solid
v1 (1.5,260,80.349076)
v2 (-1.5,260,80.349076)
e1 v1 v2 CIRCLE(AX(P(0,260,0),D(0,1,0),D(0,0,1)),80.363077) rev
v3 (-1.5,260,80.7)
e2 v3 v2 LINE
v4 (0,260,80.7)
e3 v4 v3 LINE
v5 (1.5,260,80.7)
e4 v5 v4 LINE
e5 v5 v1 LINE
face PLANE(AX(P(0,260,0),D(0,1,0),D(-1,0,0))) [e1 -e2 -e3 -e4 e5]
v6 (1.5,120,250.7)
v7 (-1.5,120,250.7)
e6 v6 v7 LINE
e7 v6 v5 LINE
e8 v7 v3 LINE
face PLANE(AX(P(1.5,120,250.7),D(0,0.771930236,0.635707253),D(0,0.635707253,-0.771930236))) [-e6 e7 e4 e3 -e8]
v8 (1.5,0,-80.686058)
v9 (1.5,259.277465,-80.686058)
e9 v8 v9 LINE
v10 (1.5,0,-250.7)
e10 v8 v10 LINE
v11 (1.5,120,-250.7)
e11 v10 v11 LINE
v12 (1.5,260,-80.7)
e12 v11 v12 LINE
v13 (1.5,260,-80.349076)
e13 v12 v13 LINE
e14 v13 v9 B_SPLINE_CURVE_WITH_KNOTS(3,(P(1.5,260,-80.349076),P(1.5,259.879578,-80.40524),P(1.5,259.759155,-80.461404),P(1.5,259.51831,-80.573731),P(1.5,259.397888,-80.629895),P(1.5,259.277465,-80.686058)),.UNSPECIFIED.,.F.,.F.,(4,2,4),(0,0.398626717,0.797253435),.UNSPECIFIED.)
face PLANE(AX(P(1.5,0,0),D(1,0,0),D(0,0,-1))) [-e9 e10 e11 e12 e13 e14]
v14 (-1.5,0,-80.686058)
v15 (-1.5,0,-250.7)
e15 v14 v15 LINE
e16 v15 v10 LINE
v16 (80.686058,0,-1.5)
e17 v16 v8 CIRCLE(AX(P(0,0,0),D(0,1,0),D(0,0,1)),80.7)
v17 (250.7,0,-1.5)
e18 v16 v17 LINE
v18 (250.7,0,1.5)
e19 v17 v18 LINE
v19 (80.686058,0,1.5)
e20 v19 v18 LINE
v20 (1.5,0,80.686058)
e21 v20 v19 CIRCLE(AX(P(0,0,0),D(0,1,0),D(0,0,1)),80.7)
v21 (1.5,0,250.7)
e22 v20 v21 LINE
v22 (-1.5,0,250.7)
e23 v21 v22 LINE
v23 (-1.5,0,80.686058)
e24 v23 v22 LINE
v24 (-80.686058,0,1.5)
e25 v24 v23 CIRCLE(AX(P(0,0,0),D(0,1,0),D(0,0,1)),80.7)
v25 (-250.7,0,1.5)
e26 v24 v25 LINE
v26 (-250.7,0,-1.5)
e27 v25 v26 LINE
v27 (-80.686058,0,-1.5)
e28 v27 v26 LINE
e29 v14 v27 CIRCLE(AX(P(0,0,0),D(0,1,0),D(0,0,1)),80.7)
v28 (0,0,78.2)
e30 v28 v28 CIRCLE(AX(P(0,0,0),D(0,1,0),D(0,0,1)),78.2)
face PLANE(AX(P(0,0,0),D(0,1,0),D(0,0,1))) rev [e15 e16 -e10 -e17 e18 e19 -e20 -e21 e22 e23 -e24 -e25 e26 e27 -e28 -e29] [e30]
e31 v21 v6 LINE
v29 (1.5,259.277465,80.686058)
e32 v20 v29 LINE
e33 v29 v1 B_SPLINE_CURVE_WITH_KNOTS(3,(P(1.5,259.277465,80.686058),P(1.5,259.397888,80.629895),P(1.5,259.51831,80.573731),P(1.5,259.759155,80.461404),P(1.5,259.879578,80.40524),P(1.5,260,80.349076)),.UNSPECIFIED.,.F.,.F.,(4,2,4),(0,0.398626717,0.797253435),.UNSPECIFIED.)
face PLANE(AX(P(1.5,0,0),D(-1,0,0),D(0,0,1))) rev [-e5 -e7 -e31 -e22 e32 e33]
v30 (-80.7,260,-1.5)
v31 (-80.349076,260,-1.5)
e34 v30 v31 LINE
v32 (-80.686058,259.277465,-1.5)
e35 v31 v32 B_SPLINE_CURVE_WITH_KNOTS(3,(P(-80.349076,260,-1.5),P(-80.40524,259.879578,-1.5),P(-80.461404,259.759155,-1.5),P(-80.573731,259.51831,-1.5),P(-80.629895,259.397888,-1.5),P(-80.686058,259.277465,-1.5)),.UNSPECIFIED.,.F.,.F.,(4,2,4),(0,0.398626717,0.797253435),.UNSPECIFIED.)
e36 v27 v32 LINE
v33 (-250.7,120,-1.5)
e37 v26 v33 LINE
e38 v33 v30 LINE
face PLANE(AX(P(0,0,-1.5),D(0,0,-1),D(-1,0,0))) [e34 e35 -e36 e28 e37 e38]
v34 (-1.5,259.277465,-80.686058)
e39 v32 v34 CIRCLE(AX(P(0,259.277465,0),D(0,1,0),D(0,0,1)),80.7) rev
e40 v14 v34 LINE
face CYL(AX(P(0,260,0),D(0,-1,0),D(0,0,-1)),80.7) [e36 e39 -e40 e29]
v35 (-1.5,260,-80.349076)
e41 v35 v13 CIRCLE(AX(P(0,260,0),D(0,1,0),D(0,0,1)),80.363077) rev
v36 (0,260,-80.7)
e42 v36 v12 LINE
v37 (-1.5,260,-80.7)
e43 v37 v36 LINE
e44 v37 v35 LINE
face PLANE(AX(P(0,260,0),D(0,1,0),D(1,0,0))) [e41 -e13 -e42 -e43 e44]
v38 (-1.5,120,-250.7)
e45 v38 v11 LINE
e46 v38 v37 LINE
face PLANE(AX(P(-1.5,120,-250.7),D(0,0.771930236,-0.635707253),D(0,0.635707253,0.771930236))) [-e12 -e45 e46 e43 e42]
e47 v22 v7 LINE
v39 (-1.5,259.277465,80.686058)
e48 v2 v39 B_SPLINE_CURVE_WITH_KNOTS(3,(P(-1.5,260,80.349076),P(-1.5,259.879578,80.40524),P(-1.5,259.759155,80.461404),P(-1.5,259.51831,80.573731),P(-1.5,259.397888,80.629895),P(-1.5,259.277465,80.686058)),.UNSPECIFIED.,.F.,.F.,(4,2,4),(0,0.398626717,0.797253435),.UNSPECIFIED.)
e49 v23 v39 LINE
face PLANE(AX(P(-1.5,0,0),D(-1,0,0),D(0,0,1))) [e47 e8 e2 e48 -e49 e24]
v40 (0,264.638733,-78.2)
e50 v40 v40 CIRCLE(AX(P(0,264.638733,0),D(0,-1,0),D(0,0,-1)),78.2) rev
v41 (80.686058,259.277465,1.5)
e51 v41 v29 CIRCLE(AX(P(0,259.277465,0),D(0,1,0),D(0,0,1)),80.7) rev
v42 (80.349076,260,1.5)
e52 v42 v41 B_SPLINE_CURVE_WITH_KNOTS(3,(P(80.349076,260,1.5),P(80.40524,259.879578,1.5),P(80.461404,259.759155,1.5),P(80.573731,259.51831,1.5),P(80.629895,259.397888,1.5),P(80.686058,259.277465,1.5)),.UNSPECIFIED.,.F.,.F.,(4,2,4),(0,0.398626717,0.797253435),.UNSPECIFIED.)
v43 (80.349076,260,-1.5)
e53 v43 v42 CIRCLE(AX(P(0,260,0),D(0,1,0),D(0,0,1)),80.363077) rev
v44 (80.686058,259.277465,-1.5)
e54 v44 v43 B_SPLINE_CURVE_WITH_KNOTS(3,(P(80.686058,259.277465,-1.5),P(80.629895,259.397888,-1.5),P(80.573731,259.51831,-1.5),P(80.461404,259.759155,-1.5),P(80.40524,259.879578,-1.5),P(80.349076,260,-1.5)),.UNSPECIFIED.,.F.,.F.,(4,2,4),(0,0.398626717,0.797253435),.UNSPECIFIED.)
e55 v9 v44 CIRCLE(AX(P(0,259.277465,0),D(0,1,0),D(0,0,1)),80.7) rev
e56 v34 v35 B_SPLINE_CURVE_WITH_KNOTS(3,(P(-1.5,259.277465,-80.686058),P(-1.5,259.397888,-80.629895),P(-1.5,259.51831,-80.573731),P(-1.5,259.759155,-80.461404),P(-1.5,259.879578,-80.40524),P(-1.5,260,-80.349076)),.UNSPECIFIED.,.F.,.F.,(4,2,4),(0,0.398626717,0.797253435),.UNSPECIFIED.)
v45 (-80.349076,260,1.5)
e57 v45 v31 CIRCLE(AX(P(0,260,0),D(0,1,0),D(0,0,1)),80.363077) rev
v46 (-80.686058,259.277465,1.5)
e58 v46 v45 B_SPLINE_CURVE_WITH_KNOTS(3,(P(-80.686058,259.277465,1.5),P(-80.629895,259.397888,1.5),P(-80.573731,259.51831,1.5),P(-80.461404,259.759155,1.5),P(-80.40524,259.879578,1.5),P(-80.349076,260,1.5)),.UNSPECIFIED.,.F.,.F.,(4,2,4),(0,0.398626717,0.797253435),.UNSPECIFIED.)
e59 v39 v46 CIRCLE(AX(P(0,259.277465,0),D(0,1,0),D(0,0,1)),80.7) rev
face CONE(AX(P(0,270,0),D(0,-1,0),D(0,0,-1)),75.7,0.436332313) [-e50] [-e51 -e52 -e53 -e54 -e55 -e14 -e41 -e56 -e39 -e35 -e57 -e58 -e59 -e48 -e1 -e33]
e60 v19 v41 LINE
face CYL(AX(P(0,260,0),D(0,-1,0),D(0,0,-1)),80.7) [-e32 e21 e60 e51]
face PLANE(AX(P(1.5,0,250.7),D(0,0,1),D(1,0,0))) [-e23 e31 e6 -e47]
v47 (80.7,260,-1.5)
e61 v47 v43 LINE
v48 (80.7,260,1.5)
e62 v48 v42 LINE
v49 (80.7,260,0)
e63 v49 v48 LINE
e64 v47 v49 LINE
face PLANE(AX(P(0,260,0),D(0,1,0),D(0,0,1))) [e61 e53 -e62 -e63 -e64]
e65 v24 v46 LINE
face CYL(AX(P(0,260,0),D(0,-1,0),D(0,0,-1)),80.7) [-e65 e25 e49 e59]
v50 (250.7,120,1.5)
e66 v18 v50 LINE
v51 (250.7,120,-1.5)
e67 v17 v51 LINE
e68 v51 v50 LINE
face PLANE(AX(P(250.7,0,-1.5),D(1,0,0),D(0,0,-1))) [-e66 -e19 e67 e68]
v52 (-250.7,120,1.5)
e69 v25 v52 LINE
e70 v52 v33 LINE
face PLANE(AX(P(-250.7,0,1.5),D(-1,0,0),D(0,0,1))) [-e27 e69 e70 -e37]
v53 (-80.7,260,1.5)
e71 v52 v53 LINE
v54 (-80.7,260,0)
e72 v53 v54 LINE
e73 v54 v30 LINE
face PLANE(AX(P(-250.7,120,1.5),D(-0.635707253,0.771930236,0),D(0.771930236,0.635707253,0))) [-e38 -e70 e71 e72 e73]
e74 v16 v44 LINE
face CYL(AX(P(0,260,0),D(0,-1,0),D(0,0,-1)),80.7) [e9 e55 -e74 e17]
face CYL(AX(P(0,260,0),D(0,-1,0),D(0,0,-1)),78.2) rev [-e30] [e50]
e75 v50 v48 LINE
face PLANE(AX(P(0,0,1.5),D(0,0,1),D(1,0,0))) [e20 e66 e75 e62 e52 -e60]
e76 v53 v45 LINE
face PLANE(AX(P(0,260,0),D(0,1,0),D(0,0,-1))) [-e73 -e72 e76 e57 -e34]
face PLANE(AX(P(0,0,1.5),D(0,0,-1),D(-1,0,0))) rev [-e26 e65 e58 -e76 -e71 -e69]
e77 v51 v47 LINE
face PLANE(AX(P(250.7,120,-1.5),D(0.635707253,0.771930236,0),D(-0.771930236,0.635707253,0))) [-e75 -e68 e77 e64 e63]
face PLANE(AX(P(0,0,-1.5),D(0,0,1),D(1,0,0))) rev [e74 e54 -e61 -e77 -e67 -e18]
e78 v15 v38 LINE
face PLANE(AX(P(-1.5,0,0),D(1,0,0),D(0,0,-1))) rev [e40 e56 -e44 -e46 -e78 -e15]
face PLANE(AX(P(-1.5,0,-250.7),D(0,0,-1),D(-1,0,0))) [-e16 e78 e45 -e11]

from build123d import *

# Parameters (mm, degrees)
SKETCH1_R                = 80.7
SKETCH1_R_2              = 78.2
BOSS_EXTRUDE1_DEPTH      = 260
BOSS_EXTRUDE2_DEPTH      = 1.5
BOSS_EXTRUDE2_DEPTH_BACK = 1.5
BOSS_EXTRUDE3_DEPTH      = 1.5
BOSS_EXTRUDE3_DEPTH_BACK = 1.5
SKETCH4_W                = 2
SKETCH4_H                = 260
CIRPATTERN1_COUNT        = 4
SKETCH6_R                = 78.2
BOSS_EXTRUDE4_DEPTH      = 10
CHAMFER1_START           = 264.638732699
CHAMFER1_2_OUTLINE_R     = 80.7
CHAMFER1_2_OUTLINE_R_2   = 78.2
CHAMFER1_2_DEPTH         = 5.361267301
CHAMFER1_START_2         = 258
CHAMFER1_3_DEPTH         = 2


with BuildPart() as part:
    # Sketch1 → Boss-Extrude1 (new body)
    with BuildSketch(Plane(origin=(0, 0, 0), x_dir=(1, 0, 0), z_dir=(0, 1, 0))):
        with Locations(Location((0, 0, 0), (0, 0, 270))):
            Circle(SKETCH1_R)
        with Locations(Location((0, 0, 0), (0, 0, 270))):
            Circle(SKETCH1_R_2, mode=Mode.SUBTRACT)
    extrude(amount=BOSS_EXTRUDE1_DEPTH)



with BuildPart() as body_2:
    # Sketch2 → Boss-Extrude2 (new, two sides: drawn at the far end of the back side and taken through both)
    with BuildSketch(Plane.XY.offset(-BOSS_EXTRUDE2_DEPTH_BACK)):
        Polygon((80.7, 0), (80.7, 260), (250.7, 120), (250.7, 0), align=None)
    extrude(amount=BOSS_EXTRUDE2_DEPTH + BOSS_EXTRUDE2_DEPTH_BACK)


with BuildPart() as part_1:
    add(part.part)

    add(body_2.part)  # Boss-Extrude3 merges body 2
    # Sketch4 → Boss-Extrude3 (add, two sides: drawn at the far end of the back side and taken through both)
    with BuildSketch(Plane.XY.offset(-BOSS_EXTRUDE3_DEPTH_BACK)):
        with Locations((79.7, 130)):
            Rectangle(SKETCH4_W, SKETCH4_H)
    extrude(amount=BOSS_EXTRUDE3_DEPTH + BOSS_EXTRUDE3_DEPTH_BACK)


with BuildPart() as cirpattern1_1:
    # CirPattern1: pattern copy
    add(part_1.part.rotate(Axis((0, 0, 0), (0, 1, 0)), 1 * 360 / CIRPATTERN1_COUNT))


with BuildPart() as cirpattern1_2:
    # CirPattern1: pattern copy
    add(part_1.part.rotate(Axis((0, 0, 0), (0, 1, 0)), 2 * 360 / CIRPATTERN1_COUNT))


with BuildPart() as cirpattern1_3:
    # CirPattern1: pattern copy
    add(part_1.part.rotate(Axis((0, 0, 0), (0, 1, 0)), 3 * 360 / CIRPATTERN1_COUNT))


with BuildPart() as part_2:
    add(part_1.part)

    add(cirpattern1_1.part)  # Boss-Extrude4 merges CirPattern1_1

    add(cirpattern1_2.part)  # Boss-Extrude4 merges CirPattern1_2

    add(cirpattern1_3.part)  # Boss-Extrude4 merges CirPattern1_3
    # Sketch6 → Boss-Extrude4 (add)
    with BuildSketch(Plane(origin=(0, 260, 0), x_dir=(1, 0, 0), z_dir=(0, 1, 0))):
        with BuildLine():
            ThreePointArc((80.686058275, -1.5), (80.7, 0), (80.686058275, 1.5))
            ThreePointArc((80.686058275, 1.5), (57.063517242, 57.063517242), (1.5, 80.686058275))
            ThreePointArc((1.5, 80.686058275), (0, 80.7), (-1.5, 80.686058275))
            ThreePointArc((-1.5, 80.686058275), (-57.063517242, -57.063517242), (80.686058275, -1.5))
        make_face()
        with Locations(Location((0, 0, 0), (0, 0, 270))):
            Circle(SKETCH6_R, mode=Mode.SUBTRACT)
    extrude(amount=BOSS_EXTRUDE4_DEPTH)

    # Chamfer1: read off the stored shape, not the designer's step
    # Chamfer1 outline → Chamfer1 (revolve, cut)
    with BuildSketch(Plane.XY):
        Polygon((78.2, 264.638732699), (80.7, 259.277465397), (80.7, 264.638732699), align=None)
    revolve(axis=Axis((0, 0, 0), (0, 1, 0)), mode=Mode.SUBTRACT)

    # Chamfer1 2 outline → Chamfer1 2 (cut)
    with BuildSketch(Plane(origin=(0, 0, 0), x_dir=(1, 0, 0), z_dir=(0, 1, 0)).offset(CHAMFER1_START)):
        Circle(CHAMFER1_2_OUTLINE_R)
        Circle(CHAMFER1_2_OUTLINE_R_2, mode=Mode.SUBTRACT)
    extrude(amount=CHAMFER1_2_DEPTH, mode=Mode.SUBTRACT)

    # Chamfer1 3 outline → Chamfer1 3 (add)
    with BuildSketch(Plane(origin=(0, 0, 0), x_dir=(1, 0, 0), z_dir=(0, 1, 0)).offset(CHAMFER1_START_2)):
        with BuildLine():
            ThreePointArc((80.686058275, -1.5), (80.7, 0), (80.686058275, 1.5))
            Line((80.686058275, 1.5), (80.349076396, 1.5))
            ThreePointArc((80.349076396, 1.5), (80.363076582, 0), (80.349076396, -1.5))
            Line((80.349076396, -1.5), (80.686058275, -1.5))
        make_face()
        with BuildLine():
            Line((1.5, 80.349076396), (1.5, 80.686058275))
            ThreePointArc((1.5, 80.686058275), (0, 80.7), (-1.5, 80.686058275))
            Line((-1.5, 80.686058275), (-1.5, 80.349076396))
            ThreePointArc((-1.5, 80.349076396), (0, 80.363076582), (1.5, 80.349076396))
        make_face()
        with BuildLine():
            ThreePointArc((-1.5, -80.686058275), (0, -80.7), (1.5, -80.686058275))
            Line((1.5, -80.686058275), (1.5, -80.349076396))
            ThreePointArc((1.5, -80.349076396), (0, -80.363076582), (-1.5, -80.349076396))
            Line((-1.5, -80.349076396), (-1.5, -80.686058275))
        make_face()
        with BuildLine():
            Line((-80.349076396, 1.5), (-80.686058275, 1.5))
            ThreePointArc((-80.686058275, 1.5), (-80.7, 0), (-80.686058275, -1.5))
            Line((-80.686058275, -1.5), (-80.349076396, -1.5))
            ThreePointArc((-80.349076396, -1.5), (-80.363076582, 0), (-80.349076396, 1.5))
        make_face()
    extrude(amount=CHAMFER1_3_DEPTH)


solid = part_2.part
